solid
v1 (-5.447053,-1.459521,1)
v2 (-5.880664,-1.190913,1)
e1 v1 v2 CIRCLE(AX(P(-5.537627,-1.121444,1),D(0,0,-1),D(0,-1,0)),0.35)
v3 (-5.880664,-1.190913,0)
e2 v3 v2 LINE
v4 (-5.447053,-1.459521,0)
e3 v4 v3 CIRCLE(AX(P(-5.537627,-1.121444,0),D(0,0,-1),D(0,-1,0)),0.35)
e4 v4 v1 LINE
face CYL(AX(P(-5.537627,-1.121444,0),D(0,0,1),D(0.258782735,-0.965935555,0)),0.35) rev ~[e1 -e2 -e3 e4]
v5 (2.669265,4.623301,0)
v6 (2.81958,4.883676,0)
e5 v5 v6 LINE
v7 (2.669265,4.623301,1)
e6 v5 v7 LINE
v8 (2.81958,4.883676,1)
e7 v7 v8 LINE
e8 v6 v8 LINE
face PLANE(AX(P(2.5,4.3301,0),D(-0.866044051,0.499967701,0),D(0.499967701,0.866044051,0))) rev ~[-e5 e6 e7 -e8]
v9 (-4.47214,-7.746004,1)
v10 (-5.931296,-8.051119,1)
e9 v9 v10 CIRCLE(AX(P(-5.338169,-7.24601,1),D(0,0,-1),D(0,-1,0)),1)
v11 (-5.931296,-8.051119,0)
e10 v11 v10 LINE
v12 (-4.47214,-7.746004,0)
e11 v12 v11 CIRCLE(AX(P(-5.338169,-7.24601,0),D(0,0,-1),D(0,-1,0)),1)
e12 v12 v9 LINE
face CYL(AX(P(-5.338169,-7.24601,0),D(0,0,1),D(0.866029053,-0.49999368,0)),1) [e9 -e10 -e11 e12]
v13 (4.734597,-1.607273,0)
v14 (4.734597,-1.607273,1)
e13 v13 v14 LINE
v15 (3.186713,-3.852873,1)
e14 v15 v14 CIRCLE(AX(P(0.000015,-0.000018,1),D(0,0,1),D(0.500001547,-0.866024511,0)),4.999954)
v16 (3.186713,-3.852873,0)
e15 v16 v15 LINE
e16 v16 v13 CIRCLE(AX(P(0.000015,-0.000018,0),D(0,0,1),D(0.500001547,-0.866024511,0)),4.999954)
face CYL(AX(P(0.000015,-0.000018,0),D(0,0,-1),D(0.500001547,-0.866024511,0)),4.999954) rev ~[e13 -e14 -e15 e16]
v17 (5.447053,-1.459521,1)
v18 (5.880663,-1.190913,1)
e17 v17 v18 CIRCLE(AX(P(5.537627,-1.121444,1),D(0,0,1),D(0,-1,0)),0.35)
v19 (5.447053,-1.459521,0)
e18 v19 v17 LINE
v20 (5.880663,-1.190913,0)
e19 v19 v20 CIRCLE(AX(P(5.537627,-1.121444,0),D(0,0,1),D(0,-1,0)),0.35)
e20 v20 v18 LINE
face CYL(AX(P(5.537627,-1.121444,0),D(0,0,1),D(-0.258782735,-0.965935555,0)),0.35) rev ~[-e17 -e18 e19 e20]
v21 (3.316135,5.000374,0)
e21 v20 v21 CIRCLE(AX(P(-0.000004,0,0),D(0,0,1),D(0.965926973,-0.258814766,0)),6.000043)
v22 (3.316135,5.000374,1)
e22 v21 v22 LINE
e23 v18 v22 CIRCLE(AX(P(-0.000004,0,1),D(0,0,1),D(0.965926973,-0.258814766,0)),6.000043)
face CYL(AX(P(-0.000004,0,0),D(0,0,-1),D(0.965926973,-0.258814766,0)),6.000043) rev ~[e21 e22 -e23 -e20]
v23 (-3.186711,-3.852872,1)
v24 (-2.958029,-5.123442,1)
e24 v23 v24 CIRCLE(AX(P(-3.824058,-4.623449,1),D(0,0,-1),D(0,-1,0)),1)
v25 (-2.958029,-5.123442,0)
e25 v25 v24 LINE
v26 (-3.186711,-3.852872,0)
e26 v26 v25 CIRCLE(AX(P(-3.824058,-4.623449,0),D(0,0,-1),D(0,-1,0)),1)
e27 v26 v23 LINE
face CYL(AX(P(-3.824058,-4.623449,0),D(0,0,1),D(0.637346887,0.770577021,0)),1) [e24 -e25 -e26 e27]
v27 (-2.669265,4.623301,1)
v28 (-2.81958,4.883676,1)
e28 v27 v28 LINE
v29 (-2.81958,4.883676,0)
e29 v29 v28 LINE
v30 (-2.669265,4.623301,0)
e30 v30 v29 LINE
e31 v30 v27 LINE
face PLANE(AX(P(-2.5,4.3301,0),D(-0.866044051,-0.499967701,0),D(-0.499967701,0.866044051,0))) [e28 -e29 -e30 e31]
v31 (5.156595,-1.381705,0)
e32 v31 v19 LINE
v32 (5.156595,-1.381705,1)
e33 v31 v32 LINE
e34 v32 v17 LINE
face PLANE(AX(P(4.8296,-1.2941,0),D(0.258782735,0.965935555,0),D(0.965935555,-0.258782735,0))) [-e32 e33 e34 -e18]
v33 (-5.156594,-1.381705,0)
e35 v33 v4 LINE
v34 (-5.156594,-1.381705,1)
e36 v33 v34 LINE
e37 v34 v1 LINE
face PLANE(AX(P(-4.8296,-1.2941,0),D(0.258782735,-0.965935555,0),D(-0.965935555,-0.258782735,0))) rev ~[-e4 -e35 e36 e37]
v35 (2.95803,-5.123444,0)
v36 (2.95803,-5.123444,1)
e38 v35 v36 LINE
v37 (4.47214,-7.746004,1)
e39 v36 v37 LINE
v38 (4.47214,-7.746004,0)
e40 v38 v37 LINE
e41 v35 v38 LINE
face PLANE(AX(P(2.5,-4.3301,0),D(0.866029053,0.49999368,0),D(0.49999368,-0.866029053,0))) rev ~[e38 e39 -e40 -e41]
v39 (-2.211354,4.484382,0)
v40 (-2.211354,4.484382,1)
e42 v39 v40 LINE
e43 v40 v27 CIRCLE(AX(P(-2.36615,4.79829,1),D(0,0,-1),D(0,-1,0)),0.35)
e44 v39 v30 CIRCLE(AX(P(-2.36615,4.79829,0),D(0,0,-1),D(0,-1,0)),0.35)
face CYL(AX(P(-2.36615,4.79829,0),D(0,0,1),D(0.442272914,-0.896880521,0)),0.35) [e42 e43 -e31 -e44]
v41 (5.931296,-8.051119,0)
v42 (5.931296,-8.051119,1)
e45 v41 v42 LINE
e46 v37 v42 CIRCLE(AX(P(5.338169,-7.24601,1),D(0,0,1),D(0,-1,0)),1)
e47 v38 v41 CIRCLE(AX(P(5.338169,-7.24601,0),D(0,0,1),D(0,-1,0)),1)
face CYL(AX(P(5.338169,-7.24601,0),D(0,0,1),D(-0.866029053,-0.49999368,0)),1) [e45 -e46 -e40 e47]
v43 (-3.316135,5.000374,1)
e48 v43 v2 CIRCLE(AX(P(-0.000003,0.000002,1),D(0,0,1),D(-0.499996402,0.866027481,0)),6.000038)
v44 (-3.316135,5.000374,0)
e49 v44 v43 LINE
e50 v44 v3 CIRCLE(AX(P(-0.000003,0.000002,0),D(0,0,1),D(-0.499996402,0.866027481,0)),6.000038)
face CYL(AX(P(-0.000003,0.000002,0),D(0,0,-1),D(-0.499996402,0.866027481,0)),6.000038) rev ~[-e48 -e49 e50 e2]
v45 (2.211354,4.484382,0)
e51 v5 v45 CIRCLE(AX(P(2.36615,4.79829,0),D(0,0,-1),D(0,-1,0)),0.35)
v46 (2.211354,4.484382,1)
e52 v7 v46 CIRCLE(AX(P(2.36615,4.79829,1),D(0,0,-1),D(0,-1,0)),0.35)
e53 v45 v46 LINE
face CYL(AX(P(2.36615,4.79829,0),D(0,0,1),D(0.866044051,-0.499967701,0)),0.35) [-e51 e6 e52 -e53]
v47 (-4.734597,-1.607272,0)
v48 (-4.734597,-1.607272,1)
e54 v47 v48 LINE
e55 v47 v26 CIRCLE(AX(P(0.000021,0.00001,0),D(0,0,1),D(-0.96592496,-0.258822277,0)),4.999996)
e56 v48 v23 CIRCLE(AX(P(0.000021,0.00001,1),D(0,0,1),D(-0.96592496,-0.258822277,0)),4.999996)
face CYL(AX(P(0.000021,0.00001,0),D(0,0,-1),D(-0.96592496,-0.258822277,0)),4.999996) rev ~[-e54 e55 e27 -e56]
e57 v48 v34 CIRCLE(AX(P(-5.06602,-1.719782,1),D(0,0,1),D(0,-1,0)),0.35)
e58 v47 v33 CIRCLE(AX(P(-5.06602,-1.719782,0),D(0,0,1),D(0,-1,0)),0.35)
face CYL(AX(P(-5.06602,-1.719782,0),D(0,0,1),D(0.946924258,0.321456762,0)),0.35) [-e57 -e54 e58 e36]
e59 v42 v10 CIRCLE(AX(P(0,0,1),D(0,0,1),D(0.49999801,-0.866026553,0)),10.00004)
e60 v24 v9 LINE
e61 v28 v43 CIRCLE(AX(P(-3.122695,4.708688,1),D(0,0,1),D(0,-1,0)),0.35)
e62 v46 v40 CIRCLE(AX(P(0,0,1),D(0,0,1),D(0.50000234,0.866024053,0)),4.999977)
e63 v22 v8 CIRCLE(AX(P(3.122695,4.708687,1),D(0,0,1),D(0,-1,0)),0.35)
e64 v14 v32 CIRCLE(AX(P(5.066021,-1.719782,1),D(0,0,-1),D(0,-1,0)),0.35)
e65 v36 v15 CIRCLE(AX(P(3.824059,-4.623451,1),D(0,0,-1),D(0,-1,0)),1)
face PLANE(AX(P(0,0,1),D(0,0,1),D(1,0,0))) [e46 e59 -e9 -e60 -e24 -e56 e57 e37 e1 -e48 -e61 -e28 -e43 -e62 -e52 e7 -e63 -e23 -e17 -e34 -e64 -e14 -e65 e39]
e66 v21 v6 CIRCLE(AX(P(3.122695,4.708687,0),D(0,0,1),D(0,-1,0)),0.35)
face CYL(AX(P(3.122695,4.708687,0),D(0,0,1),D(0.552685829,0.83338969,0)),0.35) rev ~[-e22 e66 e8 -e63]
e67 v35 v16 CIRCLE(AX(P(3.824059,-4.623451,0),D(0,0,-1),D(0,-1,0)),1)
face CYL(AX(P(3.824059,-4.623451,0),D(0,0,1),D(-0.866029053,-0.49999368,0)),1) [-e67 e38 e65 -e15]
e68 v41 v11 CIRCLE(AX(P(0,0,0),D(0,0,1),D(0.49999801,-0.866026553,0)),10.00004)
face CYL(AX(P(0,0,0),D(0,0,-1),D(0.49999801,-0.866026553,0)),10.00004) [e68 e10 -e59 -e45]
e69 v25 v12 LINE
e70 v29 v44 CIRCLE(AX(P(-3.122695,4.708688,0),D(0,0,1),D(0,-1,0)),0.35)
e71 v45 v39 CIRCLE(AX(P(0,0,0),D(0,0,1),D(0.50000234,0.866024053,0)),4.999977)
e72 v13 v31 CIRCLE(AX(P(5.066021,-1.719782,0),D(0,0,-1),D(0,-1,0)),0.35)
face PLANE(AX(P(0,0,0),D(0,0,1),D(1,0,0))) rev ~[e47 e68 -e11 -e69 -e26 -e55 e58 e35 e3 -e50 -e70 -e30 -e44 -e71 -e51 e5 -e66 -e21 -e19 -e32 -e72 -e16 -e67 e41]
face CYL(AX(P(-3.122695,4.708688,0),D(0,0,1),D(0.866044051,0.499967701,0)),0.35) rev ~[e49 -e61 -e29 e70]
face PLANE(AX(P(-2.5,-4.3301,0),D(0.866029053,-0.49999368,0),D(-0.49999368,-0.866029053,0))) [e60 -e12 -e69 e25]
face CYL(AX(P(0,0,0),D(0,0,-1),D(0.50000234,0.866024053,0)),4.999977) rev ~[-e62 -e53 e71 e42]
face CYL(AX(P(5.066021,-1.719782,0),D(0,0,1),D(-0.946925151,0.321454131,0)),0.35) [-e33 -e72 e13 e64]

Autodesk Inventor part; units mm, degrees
ref_plane "YZ Plane" through (0, 0, 0) normal (1, 0, 0) x (0, 1, 0)
ref_plane "XZ Plane" through (0, 0, 0) normal (0, 1, 0) x (-1, 0, 0)
ref_plane "XY Plane" through (0, 0, 0) normal (0, 0, 1) x (1, 0, 0)
sketch "Esboço1" plane through (0, 0, 0) normal (0, 0, 1) x (1, 0, 0)
  arc A0 (5, -8.6603) -> (-5, -8.6603) centre (0, 0) ccw
  line L0 (0, 0) -> (3, 0)
  line L1 (0, 0) -> (3, 0) construction
  line L2 (-2.5, -4.3301) -> (-5, -8.6603)
  line L3 (2.5, -4.3301) -> (5, -8.6603)
  line L4 (-2.5, 4.3301) -> (-3, 5.1962)
  line L5 (2.5, 4.3301) -> (3, 5.1962)
  arc A1 (-3, 5.1962) -> (-5.7956, -1.5529) centre (0, 0) ccw
  arc A2 (5.7956, -1.5529) -> (3, 5.1962) centre (0, 0) ccw
  arc A3 (-4.8296, -1.2941) -> (-2.5, -4.3301) centre (0, 0) ccw
  arc A4 (2.5, -4.3301) -> (4.8296, -1.2941) centre (0, 0) ccw
  arc A5 (2.5, 4.3301) -> (-2.5, 4.3301) centre (0, 0) ccw
  line L6 (-4.8296, -1.2941) -> (-5.7956, -1.5529)
  line L7 (4.8296, -1.2941) -> (5.7956, -1.5529)
  dimension "d3" = 3
  dimension "d4" = 0
  dimension "d5" = 60
  dimension "d6" = 60
  dimension "d9" = 45
  dimension "d10" = 45
  dimension "d11" = 5
  dimension "d12" = 5
  dimension "d13" = 6
  dimension "d14" = 6
  dimension "d15" = 5
  dimension "d20" = 4
extrude "Placa1" add sketch "Esboço1" along normal blind 1
fillet "Arredondamento de canto1" radius 1 4 edges at (-2.5, -4.3301, 0.5) (-5, -8.6603, 0.5) (5, -8.6603, 0.5) (2.5, -4.3301, 0.5)
fillet "Arredondamento de canto2" radius 0.35 8 edges at (-4.8296, -1.2941, 0.5) (-5.7956, -1.5529, 0.5) (-2.5, 4.3301, 0.5) (-3, 5.1962, 0.5) (2.5, 4.3301, 0.5) (3, 5.1962, 0.5) (5.7956, -1.5529, 0.5) (4.8296, -1.2941, 0.5)
equation "\"d12\" = d15"
equation "\"d13\" = d14"
equation "\"d15\" = d11"
equation "\"Raio_dobra\" = Espessura"
equation "\"Largura_alívio_de_dobra\" = Espessura"
equation "\"Profundidade_alívio_de_dobra\" = 0.5 * Espessura"
equation "\"Tamanho_alívio_de_dobra\" = 4 * Espessura"
equation "\"Remanescente_mínimo\" = 2 * Espessura"
equation "\"Raiodetransição\" = Raio_dobra"
equation "\"Tamanho_de_raio_de_Jacobi\" = Raio_dobra"
equation "\"TamanhoFolga\" = Espessura"
equation "\"d8\" = d7"
equation "\"d17\" = Raio_dobra"
equation "\"Espessura\" = 1"
equation "\"d7\" = 45deg"
properties part number "anel_elastico" material "Padrão"
